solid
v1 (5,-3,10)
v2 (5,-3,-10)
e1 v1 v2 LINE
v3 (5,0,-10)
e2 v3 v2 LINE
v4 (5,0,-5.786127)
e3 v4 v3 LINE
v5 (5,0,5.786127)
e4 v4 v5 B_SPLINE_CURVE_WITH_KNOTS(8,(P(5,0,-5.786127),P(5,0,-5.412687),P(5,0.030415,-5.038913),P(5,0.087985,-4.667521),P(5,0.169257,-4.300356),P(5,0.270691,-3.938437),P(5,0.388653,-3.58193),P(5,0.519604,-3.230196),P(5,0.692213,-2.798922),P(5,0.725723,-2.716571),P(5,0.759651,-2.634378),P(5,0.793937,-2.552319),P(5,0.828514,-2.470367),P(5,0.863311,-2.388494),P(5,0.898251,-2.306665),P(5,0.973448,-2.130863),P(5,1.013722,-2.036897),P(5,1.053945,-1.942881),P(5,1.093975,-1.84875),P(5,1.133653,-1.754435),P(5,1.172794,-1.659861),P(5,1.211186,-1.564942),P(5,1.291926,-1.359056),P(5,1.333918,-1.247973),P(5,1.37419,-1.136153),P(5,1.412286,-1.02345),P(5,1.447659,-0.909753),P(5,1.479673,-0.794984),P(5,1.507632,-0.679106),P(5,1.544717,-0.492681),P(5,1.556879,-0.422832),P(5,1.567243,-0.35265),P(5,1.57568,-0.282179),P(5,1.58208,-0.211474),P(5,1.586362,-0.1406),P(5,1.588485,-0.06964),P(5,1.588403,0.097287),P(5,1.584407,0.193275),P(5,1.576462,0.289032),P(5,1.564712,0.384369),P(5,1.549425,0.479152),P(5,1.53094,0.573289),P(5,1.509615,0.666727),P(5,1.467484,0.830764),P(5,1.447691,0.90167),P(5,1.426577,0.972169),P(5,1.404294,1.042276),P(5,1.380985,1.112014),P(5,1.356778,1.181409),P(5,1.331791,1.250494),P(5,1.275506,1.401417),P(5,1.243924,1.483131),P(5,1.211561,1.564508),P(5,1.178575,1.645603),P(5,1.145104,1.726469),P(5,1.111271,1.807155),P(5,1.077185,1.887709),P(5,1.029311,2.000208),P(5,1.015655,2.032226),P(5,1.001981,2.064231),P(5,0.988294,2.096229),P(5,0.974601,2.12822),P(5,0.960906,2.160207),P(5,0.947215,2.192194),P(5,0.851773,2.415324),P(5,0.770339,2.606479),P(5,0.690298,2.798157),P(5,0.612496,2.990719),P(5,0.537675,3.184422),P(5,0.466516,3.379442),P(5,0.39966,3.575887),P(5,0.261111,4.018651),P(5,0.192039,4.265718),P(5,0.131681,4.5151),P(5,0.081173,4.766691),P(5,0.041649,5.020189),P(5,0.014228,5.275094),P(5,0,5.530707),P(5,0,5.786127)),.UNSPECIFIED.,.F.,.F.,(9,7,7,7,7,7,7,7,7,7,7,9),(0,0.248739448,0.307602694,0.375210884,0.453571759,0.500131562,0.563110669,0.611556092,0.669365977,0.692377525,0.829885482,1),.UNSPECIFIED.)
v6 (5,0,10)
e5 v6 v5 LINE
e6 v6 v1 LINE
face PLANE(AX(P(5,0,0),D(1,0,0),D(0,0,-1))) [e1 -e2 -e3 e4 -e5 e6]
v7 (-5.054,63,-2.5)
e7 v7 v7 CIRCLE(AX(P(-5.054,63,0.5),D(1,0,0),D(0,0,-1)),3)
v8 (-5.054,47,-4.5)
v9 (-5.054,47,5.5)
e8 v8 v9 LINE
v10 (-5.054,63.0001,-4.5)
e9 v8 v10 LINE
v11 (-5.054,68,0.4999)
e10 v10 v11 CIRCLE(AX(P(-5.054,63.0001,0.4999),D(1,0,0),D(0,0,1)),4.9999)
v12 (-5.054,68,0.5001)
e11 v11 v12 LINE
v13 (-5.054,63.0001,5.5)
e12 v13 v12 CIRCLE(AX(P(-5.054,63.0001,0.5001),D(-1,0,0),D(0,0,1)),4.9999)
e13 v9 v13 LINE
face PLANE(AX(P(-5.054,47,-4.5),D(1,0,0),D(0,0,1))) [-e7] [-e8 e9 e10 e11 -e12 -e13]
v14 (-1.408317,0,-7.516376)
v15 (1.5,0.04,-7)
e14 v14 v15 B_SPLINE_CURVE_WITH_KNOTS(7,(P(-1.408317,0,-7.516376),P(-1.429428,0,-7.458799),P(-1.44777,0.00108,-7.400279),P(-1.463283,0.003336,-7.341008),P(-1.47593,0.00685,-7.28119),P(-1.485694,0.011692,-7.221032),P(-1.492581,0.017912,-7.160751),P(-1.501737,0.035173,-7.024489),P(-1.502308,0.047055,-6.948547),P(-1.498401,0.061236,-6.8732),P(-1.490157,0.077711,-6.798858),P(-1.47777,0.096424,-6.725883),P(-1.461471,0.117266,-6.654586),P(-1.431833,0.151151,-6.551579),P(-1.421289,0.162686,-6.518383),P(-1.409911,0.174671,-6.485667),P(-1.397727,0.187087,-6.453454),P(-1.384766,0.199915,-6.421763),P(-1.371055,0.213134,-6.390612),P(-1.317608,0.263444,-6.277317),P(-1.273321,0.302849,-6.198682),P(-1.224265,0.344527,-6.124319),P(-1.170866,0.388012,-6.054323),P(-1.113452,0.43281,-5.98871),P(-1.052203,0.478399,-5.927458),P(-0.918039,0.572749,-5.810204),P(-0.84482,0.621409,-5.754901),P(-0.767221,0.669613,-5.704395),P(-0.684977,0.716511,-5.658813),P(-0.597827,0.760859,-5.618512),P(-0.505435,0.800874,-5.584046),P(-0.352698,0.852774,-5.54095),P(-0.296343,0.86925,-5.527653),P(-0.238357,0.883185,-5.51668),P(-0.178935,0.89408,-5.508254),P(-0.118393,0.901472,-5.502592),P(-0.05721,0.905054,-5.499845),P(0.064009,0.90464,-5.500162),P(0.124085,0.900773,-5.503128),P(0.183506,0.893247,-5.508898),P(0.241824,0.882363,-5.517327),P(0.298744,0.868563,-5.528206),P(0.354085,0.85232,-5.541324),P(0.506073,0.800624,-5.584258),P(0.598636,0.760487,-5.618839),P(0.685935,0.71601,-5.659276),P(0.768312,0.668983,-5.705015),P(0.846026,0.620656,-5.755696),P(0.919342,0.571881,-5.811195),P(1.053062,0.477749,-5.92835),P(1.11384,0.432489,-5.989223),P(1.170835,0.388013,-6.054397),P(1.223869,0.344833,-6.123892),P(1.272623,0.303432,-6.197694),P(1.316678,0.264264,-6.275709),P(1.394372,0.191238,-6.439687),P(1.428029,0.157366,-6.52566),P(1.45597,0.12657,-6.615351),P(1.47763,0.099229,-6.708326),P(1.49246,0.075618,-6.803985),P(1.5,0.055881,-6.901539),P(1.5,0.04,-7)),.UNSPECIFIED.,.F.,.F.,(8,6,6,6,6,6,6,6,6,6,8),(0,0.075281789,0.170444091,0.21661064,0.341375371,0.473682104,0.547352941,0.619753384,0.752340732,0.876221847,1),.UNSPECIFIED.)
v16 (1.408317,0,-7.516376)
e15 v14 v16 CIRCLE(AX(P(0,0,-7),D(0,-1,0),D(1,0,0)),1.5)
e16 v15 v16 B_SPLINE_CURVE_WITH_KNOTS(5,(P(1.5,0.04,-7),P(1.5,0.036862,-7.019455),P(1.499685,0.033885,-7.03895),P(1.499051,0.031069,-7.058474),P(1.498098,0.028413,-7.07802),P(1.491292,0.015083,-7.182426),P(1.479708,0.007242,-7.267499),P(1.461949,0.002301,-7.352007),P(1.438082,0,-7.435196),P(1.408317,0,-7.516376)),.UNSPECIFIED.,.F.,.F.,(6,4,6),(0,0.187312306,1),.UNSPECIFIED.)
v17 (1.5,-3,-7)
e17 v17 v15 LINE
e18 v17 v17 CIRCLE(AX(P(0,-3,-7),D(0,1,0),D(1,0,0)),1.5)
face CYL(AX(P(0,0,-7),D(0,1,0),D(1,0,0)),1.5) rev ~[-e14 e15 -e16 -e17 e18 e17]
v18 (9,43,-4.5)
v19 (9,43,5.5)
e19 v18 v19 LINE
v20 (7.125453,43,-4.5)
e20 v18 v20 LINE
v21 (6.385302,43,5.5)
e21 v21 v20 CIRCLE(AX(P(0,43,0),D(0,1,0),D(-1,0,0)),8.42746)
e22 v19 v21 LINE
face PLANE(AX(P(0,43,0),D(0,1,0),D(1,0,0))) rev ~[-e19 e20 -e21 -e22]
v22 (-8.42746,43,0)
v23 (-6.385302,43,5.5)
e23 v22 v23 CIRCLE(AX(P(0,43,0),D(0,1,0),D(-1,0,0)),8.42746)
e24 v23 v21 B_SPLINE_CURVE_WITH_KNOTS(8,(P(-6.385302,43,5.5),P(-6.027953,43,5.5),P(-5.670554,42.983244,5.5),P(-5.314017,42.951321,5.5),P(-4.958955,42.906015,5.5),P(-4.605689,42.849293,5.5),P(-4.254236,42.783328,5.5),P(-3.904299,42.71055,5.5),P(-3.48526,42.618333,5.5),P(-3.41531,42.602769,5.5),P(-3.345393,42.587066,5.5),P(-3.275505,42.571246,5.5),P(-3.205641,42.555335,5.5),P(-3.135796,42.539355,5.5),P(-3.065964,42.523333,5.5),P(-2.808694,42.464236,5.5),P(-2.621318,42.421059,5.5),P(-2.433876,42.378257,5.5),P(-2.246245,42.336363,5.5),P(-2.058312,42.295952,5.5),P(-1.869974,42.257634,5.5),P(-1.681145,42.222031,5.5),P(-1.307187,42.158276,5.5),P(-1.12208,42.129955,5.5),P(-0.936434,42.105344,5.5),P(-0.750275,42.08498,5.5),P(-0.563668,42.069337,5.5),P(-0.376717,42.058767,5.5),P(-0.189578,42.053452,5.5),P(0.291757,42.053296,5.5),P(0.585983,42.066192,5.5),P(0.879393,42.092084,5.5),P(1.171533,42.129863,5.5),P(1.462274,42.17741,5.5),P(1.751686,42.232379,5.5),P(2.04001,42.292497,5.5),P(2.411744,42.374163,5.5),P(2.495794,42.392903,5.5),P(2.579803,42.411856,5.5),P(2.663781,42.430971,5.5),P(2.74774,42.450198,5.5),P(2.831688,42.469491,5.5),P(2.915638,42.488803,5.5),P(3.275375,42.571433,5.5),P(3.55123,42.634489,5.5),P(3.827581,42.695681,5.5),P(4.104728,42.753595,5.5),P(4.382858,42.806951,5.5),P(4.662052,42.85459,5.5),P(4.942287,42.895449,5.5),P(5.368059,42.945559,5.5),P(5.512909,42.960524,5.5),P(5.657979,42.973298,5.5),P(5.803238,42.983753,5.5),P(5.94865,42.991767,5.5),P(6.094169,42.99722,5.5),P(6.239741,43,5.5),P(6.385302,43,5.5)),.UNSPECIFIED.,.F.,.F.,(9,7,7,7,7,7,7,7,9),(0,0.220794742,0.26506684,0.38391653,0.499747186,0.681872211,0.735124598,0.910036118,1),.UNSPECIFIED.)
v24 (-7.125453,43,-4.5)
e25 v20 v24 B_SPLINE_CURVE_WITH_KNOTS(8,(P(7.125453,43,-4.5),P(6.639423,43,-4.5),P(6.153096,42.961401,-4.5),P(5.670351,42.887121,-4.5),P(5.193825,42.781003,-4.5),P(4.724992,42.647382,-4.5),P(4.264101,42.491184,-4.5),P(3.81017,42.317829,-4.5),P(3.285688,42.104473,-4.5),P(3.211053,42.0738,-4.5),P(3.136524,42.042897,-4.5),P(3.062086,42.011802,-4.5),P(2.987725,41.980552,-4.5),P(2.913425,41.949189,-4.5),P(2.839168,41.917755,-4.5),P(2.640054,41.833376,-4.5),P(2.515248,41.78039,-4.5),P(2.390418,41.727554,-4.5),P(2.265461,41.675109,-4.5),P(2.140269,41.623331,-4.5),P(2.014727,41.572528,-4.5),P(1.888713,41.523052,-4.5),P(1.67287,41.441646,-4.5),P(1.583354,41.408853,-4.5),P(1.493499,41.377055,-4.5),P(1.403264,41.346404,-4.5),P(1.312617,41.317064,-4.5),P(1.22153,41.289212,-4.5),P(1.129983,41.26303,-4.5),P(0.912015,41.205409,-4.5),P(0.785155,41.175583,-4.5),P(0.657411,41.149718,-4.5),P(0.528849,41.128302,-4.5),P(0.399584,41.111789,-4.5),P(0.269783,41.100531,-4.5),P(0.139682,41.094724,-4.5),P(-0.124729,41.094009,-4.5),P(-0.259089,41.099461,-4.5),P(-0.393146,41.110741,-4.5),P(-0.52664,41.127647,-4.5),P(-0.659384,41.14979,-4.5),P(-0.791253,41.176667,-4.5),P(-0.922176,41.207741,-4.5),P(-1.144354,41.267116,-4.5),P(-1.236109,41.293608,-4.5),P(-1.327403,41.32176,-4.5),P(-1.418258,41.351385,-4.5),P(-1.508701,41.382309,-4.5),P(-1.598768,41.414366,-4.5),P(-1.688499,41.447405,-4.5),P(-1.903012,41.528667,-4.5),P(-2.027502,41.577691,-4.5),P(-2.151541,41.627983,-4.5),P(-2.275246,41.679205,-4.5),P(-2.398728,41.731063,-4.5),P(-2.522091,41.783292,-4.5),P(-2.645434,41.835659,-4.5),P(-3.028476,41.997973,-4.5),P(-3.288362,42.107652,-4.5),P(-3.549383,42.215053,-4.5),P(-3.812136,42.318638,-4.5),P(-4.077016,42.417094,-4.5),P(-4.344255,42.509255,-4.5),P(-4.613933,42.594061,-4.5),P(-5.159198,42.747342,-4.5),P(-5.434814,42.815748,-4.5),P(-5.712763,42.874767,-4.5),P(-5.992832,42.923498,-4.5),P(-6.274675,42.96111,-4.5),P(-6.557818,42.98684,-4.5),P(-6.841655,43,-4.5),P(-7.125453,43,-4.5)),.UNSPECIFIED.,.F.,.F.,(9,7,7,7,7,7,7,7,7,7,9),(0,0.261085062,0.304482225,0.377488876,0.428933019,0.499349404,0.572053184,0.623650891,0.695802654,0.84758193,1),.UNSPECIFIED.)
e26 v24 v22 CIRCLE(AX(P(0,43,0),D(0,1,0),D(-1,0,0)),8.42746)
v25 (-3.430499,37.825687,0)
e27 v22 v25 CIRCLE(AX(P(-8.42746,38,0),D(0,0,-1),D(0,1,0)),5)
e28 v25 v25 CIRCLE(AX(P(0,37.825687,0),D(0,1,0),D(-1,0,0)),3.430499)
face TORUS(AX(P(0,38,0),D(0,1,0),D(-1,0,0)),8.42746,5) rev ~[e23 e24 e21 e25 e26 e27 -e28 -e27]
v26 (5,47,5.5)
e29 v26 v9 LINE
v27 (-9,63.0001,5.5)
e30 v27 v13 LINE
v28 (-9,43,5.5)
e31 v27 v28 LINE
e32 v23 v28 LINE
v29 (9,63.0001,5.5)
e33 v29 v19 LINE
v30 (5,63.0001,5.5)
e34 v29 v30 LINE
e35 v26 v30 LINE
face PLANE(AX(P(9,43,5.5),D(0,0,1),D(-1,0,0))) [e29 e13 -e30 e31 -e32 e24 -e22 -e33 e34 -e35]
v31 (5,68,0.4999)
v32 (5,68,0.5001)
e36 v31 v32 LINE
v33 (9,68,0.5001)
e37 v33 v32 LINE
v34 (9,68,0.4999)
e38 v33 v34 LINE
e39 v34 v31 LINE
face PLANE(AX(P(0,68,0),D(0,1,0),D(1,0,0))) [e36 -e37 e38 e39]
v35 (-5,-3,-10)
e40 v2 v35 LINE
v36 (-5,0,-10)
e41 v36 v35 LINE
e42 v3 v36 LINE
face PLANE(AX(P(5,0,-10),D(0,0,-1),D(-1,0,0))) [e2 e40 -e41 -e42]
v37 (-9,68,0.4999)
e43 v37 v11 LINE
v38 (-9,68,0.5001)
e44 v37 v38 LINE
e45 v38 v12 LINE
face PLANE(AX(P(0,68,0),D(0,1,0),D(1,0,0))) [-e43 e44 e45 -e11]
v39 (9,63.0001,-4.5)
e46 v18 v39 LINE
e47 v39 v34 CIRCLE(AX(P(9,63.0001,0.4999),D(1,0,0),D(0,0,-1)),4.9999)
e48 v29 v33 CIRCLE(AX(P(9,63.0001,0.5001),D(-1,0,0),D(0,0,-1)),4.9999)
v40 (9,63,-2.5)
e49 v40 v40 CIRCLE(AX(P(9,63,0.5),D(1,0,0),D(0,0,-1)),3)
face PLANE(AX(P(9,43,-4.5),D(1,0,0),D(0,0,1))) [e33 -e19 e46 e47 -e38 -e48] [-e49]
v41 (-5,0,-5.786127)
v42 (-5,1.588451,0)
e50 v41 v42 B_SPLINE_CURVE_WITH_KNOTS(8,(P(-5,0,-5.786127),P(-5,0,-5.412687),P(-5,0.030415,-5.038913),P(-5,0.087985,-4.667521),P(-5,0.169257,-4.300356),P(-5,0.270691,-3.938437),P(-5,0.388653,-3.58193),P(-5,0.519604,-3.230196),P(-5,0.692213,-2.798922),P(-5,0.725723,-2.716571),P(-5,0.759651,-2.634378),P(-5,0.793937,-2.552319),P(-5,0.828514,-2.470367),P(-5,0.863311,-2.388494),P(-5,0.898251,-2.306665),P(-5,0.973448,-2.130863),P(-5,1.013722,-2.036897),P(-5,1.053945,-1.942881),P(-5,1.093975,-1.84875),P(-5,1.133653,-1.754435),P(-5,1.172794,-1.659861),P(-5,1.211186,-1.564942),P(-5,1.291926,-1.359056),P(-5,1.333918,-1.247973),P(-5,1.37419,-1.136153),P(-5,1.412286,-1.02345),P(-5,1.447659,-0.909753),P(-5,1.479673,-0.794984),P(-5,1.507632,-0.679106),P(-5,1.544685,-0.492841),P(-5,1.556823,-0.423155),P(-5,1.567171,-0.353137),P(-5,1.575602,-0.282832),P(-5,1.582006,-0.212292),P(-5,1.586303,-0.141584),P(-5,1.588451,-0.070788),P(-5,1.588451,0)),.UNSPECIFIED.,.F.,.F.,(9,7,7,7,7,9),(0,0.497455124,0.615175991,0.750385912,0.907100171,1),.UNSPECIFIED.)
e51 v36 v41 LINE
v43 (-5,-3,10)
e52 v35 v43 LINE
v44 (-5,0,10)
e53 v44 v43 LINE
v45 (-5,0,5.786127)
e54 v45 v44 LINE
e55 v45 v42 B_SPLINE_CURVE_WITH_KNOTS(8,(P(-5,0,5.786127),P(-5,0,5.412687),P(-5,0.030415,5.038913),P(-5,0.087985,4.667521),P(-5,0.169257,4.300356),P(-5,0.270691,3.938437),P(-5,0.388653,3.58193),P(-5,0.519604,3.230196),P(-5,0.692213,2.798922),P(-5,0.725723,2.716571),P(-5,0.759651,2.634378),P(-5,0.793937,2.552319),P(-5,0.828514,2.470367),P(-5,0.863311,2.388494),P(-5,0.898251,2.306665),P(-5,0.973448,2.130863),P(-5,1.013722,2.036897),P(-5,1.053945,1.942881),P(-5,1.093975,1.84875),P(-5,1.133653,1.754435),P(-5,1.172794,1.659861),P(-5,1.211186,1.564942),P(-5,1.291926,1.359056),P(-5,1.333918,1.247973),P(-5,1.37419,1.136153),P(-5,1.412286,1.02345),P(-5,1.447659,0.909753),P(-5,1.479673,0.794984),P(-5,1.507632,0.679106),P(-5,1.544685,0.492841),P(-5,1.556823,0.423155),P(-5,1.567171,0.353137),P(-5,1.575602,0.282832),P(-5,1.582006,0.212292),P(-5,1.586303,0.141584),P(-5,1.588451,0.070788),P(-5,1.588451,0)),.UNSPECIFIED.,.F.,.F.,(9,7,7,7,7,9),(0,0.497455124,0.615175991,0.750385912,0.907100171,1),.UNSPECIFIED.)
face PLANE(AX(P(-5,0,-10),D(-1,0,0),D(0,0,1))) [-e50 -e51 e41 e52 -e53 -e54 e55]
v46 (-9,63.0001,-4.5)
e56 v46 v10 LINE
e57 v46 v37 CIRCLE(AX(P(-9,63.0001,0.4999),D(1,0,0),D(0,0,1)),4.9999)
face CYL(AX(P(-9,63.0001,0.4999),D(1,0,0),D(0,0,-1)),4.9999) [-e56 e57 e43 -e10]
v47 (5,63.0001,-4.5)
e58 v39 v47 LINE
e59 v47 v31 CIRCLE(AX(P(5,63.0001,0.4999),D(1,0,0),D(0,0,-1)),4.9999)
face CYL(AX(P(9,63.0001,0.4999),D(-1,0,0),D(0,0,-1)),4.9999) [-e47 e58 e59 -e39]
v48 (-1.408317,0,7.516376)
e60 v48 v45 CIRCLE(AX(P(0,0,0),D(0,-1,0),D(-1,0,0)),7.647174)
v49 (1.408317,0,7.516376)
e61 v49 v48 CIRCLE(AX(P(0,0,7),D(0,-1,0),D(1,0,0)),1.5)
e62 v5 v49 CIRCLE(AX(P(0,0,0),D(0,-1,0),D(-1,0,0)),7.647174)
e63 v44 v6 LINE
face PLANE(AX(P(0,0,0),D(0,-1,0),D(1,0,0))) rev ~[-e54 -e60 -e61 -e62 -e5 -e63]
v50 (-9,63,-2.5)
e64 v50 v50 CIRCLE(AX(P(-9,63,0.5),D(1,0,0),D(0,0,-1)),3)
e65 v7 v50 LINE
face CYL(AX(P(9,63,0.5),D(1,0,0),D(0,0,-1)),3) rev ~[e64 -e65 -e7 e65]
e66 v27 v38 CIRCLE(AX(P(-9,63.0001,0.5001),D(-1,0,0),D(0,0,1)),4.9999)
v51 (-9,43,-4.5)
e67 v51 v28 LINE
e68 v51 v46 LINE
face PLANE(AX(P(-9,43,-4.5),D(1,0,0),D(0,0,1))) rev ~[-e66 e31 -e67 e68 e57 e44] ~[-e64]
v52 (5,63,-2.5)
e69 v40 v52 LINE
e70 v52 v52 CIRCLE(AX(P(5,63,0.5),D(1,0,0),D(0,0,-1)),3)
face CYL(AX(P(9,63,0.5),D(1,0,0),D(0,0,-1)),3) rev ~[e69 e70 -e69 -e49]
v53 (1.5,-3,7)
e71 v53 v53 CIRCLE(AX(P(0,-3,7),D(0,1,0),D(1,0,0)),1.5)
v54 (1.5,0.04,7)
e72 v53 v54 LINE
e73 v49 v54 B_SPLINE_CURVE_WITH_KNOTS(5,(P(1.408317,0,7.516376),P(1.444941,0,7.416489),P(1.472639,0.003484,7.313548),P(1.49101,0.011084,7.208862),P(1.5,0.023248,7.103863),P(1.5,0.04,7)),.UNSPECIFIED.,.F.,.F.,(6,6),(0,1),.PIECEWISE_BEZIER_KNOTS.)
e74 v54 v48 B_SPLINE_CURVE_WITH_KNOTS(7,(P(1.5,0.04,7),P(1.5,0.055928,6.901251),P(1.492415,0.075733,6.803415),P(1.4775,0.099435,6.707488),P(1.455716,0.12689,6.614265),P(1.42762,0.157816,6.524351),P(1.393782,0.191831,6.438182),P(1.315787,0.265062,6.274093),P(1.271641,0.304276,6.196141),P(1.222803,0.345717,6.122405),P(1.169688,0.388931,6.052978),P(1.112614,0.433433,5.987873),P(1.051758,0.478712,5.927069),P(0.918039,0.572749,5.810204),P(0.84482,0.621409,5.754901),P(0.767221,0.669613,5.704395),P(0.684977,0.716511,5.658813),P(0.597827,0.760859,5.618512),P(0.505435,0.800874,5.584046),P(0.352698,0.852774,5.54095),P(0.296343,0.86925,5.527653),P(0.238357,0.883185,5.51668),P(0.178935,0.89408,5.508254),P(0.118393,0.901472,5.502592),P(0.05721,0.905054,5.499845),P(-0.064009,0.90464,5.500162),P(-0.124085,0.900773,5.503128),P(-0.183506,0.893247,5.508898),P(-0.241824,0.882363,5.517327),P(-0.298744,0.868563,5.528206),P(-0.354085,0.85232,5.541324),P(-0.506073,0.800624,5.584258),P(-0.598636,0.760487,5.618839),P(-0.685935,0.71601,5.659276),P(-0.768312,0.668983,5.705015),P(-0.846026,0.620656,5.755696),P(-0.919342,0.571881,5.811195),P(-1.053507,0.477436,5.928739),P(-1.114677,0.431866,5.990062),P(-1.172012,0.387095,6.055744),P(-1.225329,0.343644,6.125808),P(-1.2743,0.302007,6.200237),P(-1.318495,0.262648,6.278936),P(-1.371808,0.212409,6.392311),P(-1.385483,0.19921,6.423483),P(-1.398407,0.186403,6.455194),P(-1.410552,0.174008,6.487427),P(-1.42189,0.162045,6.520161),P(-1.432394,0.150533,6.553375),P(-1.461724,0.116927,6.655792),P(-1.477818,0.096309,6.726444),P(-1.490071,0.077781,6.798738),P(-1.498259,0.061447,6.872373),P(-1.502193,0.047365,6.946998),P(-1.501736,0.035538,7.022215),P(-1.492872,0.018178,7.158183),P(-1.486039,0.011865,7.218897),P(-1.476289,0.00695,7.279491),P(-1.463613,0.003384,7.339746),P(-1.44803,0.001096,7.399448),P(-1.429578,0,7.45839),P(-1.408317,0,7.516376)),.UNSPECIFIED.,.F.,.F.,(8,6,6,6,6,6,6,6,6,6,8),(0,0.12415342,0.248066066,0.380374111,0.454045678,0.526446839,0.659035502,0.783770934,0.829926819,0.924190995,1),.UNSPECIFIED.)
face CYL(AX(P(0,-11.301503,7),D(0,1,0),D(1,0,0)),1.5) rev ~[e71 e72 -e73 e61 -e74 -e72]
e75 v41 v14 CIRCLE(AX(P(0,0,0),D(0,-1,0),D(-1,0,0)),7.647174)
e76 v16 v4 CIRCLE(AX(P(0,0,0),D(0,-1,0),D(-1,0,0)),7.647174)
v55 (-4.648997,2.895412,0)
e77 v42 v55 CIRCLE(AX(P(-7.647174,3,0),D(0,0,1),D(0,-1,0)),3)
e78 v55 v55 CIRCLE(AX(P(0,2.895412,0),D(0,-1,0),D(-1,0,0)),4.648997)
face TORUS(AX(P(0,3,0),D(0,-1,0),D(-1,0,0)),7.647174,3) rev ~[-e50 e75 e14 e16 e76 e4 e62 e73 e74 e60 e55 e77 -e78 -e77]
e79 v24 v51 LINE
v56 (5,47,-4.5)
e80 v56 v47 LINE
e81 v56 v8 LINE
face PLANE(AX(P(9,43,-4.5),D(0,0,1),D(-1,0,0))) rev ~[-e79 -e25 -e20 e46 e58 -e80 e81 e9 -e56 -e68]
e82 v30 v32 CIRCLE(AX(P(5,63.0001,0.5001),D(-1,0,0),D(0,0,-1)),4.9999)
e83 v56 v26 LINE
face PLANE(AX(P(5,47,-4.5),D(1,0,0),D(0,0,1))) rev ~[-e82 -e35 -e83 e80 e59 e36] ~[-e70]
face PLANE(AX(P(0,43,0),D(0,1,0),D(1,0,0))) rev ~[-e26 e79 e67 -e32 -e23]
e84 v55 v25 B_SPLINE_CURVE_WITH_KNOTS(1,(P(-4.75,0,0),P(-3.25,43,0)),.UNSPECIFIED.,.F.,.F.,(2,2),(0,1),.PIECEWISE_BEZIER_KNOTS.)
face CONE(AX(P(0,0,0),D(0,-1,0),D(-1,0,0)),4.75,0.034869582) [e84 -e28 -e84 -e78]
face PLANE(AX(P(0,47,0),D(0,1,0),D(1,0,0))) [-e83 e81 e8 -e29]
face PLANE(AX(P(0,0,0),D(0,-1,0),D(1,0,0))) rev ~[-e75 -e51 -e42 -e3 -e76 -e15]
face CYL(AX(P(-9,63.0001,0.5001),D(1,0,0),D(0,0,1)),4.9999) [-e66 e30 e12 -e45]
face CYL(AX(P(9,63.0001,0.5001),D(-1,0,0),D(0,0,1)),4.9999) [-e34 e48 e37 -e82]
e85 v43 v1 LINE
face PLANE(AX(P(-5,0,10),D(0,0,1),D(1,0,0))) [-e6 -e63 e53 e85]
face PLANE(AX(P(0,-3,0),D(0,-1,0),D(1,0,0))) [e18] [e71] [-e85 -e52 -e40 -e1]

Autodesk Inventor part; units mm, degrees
sketch "Sketch1" plane through (0, 0, 0) normal (0, 1, 0) x (-1, 0, 0)
  circle A0 centre (0, 0) radius 4.75
  dimension "d0" = 9.5
  dimension "d31" = 0
ref_plane "Work Plane1" through (0, 43, 0) normal (0, 1, 0) x (-1, 0, 0)
sketch "Sketch2" plane through (0, 43, 0) normal (0, 1, 0) x (-1, 0, 0)
  circle A0 centre (0, 0) radius 3.25
  dimension "d2" = 6.5
  dimension "d32" = 0
loft "Loft1" add profiles "Sketch1", "Sketch2"
sketch "Sketch3" plane through (0, 0, 0) normal (0, -1, 0) x (1, 0, 0)
  circle A0 centre (0, 0) radius 4.75
  line L0 (0, 0) -> (5, 0)
  line L1 (5, 0) -> (5, -10)
  line L2 (5, -10) -> (-5, -10)
  line L3 (-5, -10) -> (-5, 10)
  line L4 (-5, 10) -> (5, 10)
  line L5 (5, 10) -> (5, 0)
  dimension "d7" = 5
  dimension "d8" = 10
  dimension "d9" = 10
  dimension "d10" = 20
  dimension "d11" = 10
  dimension "d33" = 9.5
  dimension "d34" = 5
  dimension "d35" = 0
  dimension "d36" = 5
  dimension "d37" = 0
extrude "Extrusion1" add sketch "Sketch3" along normal blind 3
sketch "Sketch4" plane through (0, 0, 0) normal (0, -1, 0) x (1, 0, 0)
  circle A0 centre (0, 0) radius 5
  dimension "d14" = 10
  dimension "d38" = 0
extrude "Extrusion2" add sketch "Sketch4" along normal blind 3
sketch "Sketch5" plane through (0, 0, 0) normal (0, 1, 0) x (1, 0, 0)
  line L0 (-5, -10) -> (5, -10)
  line L1 (0, -10) -> (0, -7)
  line L2 (0, -7) -> (0, 7)
  circle A0 centre (0, -7) radius 1.5
  circle A1 centre (0, 7) radius 1.5
  point P0 (0, 0)
  point P1 (0, 0)
  dimension "d17" = 3
  dimension "d18" = 14
  dimension "d19" = 3
  dimension "d20" = 3
  dimension "d39" = 0
  dimension "d40" = 10
  dimension "d41" = 5
  dimension "d42" = 0
  dimension "d43" = 10
extrude "Extrusion3" cut sketch "Sketch5" against normal through all
fillet "Fillet1" radius 3 1 edges at (4.75, 0, 0)
sketch "Sketch7" plane through (0, 43, 0) normal (0, 1, 0) x (1, 0, 0)
  line L0 (0, 0) -> (5, 0) construction
  line L1 (5, 0) -> (-5, 0) construction
  line L2 (-5, 0) -> (-5, -9) construction
  line L3 (9, 4.5) -> (-9, 4.5)
  line L4 (-9, 4.5) -> (-9, -5.5)
  line L5 (9, 4.5) -> (9, -5.5)
  line L6 (9, -5.5) -> (-9, -5.5)
  point P0 (-5, 9)
  dimension "d79" = 10
  dimension "d80" = 4.5
  dimension "d81" = 10
  dimension "d82" = 14
  dimension "d83" = 18
  dimension "d84" = 9
  dimension "d85" = 4
  dimension "d86" = 9
  dimension "d87" = 9
extrude "Extrusion5" add sketch "Sketch7" along normal blind 4
fillet "Fillet4" radius 5 1 edges at (3.25, 43, 0)
sketch "Sketch10" plane through (0, 47, 0) normal (0, 1, 0) x (1, 0, 0)
  line L0 (9, -5.5) -> (9, 4.5)
  line L1 (9, -5.5) -> (6.9294, -5.5)
  line L2 (-9, 4.5) -> (-9, 4.5)
  line L3 (-9, 4.5) -> (-9, -5.5)
  line L4 (-9, -5.5) -> (-9, -5.5)
  line L5 (-5.054, 4.5) -> (-5.054, -5.5)
  line L6 (5, 10) -> (5, -10) projected
  line L7 (5, 4.5) -> (5, -5.5)
  line L8 (-9, 4.5) -> (-5.054, 4.5)
  line L9 (-9, -5.5) -> (-5.054, -5.5)
  line L10 (5, -5.5) -> (9, -5.5)
  line L11 (9, -5.5) -> (9, 4.5) projected
  line L12 (9, 4.5) -> (9, -5.5)
  line L13 (-9, -5.5) -> (9, -5.5) projected
  line L14 (5, -5.5) -> (9, -5.5)
  line L15 (9, -5.5) -> (9, 4.5)
  line L16 (5, 4.5) -> (5, -5.5)
  line L17 (9, -5.5) -> (5, -5.5)
  line L18 (9, 4.5) -> (5, 4.5)
  point P0 (0, 0)
  dimension "d102" = 10.054
  dimension "d103" = 90
  dimension "d105" = 90
  dimension "d106" = 2.0706
  dimension "d108" = 18
  dimension "d109" = 18
ref_plane "Work Plane3" through (5.1564, 47, -4.5) normal (-0.9999978, 0, 0.0020944) x (0.0020944, 0, 0.9999978)
ref_plane "Work Plane2" through (0.59, 0, 0) normal (1, 0, 0) x (0, 1, 0)
extrude "Extrusion10" add sketch "Sketch10" along normal blind 21
fillet "Fillet6" radius 5 4 edges at (-7.027, 68, 5.5) (-7.027, 68, -4.5) (7, 68, 5.5) (7, 68, -4.5)
sketch "Sketch12" plane through (9, 43, 5.5) normal (1, 0, 0) x (0, 0, -1)
  arc A0 (10, 20) -> (0, 20) centre (5, 20) ccw projected
  circle A1 centre (5, 20) radius 3
  point P0 (5.5, -43)
  dimension "d113" = 6
extrude "Extrusion11" cut sketch "Sketch12" against normal blind 21
properties part number "reverse gear crank rod 1"
